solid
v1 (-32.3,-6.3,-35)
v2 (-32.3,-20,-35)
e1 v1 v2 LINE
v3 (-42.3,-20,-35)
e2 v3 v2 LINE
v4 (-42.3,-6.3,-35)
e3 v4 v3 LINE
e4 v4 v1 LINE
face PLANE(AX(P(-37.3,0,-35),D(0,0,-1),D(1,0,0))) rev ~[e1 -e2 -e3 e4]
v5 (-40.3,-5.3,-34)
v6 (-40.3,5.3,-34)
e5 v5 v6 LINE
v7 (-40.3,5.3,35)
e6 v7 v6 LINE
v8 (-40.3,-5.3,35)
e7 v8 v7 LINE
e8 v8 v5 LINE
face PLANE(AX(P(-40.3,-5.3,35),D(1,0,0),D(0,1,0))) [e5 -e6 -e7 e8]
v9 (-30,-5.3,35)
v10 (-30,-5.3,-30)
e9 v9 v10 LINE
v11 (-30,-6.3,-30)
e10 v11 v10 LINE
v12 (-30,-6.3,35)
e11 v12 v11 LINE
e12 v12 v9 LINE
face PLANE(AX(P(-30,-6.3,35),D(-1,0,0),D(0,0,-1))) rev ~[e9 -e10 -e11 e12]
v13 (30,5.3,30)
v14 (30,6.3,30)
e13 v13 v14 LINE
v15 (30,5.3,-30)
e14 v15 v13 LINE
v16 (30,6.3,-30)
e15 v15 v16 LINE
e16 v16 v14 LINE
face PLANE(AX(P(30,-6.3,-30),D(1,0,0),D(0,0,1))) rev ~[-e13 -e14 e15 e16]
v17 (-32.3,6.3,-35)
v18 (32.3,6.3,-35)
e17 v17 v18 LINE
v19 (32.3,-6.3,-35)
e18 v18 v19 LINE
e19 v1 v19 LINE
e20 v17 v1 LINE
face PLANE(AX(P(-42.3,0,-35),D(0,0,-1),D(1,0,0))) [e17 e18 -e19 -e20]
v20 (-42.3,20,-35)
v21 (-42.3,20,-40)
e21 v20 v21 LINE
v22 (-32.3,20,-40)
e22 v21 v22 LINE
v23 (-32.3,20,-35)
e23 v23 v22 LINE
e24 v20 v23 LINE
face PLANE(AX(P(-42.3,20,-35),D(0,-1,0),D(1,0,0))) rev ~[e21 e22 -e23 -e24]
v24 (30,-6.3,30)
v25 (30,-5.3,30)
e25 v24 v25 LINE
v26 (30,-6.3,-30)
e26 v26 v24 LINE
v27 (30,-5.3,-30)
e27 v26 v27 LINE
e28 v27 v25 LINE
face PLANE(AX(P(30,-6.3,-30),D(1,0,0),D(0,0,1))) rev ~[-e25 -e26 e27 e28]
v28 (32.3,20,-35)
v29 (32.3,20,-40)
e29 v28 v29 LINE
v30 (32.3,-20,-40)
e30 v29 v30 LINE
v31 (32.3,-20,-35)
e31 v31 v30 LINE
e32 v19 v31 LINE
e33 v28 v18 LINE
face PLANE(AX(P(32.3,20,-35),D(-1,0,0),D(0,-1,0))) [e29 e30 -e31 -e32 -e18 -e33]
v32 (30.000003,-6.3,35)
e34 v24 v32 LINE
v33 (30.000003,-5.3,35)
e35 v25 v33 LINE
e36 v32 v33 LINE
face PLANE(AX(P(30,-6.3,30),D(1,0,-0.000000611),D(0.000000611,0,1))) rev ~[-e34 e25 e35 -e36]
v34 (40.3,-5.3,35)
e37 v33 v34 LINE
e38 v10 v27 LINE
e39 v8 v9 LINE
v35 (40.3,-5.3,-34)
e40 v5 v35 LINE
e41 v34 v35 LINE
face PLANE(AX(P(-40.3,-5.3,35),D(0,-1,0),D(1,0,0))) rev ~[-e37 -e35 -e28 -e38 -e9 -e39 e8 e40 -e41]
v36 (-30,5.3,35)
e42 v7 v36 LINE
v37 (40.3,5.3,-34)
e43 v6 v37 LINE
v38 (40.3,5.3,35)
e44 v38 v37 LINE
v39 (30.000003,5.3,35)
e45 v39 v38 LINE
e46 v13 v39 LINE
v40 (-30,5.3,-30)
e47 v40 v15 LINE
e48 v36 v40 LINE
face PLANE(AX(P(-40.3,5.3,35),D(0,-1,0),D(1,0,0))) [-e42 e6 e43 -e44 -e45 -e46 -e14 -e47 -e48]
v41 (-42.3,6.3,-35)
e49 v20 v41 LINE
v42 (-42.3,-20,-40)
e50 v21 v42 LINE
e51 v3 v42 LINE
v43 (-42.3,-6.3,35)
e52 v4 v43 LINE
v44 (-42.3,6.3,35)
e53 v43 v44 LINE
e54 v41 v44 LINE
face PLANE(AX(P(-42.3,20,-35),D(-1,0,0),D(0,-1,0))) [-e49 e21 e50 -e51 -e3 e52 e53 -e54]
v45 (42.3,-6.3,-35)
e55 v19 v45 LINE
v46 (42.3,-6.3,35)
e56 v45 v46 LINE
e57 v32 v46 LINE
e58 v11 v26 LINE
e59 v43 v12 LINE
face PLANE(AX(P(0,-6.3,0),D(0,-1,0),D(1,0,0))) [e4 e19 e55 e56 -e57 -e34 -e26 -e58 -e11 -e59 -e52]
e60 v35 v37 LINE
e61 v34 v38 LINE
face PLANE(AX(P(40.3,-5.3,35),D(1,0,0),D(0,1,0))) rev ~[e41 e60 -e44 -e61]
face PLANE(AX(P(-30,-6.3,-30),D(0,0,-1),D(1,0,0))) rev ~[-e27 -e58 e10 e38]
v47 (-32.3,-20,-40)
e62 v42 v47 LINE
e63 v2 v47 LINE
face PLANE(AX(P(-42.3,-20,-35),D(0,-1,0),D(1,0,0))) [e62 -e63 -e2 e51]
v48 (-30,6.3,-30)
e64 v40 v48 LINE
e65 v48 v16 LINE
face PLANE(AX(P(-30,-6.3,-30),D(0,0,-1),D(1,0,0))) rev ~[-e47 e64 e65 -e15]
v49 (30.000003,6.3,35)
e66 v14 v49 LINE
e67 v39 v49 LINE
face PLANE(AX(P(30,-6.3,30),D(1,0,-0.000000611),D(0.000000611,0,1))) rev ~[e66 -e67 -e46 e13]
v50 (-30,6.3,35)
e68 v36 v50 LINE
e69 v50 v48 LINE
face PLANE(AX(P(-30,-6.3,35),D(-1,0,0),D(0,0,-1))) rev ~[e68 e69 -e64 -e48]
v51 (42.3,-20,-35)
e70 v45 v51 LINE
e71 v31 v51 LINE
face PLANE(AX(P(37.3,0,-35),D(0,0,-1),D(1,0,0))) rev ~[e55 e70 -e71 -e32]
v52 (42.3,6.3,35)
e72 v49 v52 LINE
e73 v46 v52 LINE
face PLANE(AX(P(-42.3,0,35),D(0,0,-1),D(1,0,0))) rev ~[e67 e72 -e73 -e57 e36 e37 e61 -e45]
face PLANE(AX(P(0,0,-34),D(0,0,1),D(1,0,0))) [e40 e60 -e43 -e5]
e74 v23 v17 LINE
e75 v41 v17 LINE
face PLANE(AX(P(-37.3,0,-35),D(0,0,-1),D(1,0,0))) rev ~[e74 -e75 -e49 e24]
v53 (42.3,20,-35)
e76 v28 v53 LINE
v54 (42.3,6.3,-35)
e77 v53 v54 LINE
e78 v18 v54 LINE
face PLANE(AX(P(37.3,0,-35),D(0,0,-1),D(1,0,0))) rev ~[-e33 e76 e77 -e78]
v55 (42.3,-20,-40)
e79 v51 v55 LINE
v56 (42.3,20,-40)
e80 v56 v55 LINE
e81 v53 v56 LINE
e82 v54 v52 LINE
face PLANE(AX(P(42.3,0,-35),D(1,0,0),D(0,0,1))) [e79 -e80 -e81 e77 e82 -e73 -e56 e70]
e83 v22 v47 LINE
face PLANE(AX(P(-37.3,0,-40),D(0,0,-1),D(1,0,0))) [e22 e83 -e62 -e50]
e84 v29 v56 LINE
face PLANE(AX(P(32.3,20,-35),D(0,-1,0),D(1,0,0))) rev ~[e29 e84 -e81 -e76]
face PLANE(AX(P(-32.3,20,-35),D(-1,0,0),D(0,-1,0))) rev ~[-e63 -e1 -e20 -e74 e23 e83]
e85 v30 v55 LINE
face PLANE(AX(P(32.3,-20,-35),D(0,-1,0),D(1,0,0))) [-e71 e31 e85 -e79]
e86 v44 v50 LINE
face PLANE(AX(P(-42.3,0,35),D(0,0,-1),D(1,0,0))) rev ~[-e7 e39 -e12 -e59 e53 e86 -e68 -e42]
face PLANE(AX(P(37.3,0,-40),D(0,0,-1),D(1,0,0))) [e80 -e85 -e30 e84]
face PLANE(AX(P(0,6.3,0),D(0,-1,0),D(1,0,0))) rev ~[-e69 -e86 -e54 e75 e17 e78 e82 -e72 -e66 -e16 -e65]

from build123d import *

# Parameters (mm, degrees)
F0_W     = 84.6
F0_H     = 70
F1_DEPTH = 6.3
F2_DEPTH = 6.3
F3_W     = 80.6
F3_H     = 10.6
F4_DEPTH = 69
F6_DEPTH = 25
F7_W     = 10
F7_H     = 40
F8_DEPTH = 5


# Not quite as in the source:
# - ends of sketch curves that miss each other by under 0.0002 mm in the source are joined


with BuildPart() as f1:
    # F0 (on Front) → F1 (new body)
    with BuildSketch(Plane.XZ):
        Rectangle(F0_W, F0_H)
    extrude(amount=F1_DEPTH)

    # F0 (on Front) → F2 (join)
    with BuildSketch(Plane.XZ):
        Rectangle(F0_W, F0_H)
    extrude(amount=-F2_DEPTH)

    # F3 (on face) → F4 (cut)
    with BuildSketch(Plane.XY.offset(35)):
        Rectangle(F3_W, F3_H)
    extrude(amount=-F4_DEPTH, mode=Mode.SUBTRACT)

    # F5 (on face) → F6 (cut)
    with BuildSketch(Plane.XZ.offset(6.3)):
        Polygon((-30, 30), (-30, -30), (30, -30), (30, 30), (30.0000030547, 35), (-30, 35), align=None)
    extrude(amount=-F6_DEPTH, mode=Mode.SUBTRACT)

    # F7 (on face) → F8 (join)
    with BuildSketch(Plane(origin=(0, 0, -35), x_dir=(1, 0, 0), z_dir=(0, 0, -1))):
        with Locations((-37.3, 0)):
            Rectangle(F7_W, F7_H)
        with Locations((37.3, 0)):
            Rectangle(F7_W, F7_H)
    extrude(amount=F8_DEPTH)


solid = f1.part
